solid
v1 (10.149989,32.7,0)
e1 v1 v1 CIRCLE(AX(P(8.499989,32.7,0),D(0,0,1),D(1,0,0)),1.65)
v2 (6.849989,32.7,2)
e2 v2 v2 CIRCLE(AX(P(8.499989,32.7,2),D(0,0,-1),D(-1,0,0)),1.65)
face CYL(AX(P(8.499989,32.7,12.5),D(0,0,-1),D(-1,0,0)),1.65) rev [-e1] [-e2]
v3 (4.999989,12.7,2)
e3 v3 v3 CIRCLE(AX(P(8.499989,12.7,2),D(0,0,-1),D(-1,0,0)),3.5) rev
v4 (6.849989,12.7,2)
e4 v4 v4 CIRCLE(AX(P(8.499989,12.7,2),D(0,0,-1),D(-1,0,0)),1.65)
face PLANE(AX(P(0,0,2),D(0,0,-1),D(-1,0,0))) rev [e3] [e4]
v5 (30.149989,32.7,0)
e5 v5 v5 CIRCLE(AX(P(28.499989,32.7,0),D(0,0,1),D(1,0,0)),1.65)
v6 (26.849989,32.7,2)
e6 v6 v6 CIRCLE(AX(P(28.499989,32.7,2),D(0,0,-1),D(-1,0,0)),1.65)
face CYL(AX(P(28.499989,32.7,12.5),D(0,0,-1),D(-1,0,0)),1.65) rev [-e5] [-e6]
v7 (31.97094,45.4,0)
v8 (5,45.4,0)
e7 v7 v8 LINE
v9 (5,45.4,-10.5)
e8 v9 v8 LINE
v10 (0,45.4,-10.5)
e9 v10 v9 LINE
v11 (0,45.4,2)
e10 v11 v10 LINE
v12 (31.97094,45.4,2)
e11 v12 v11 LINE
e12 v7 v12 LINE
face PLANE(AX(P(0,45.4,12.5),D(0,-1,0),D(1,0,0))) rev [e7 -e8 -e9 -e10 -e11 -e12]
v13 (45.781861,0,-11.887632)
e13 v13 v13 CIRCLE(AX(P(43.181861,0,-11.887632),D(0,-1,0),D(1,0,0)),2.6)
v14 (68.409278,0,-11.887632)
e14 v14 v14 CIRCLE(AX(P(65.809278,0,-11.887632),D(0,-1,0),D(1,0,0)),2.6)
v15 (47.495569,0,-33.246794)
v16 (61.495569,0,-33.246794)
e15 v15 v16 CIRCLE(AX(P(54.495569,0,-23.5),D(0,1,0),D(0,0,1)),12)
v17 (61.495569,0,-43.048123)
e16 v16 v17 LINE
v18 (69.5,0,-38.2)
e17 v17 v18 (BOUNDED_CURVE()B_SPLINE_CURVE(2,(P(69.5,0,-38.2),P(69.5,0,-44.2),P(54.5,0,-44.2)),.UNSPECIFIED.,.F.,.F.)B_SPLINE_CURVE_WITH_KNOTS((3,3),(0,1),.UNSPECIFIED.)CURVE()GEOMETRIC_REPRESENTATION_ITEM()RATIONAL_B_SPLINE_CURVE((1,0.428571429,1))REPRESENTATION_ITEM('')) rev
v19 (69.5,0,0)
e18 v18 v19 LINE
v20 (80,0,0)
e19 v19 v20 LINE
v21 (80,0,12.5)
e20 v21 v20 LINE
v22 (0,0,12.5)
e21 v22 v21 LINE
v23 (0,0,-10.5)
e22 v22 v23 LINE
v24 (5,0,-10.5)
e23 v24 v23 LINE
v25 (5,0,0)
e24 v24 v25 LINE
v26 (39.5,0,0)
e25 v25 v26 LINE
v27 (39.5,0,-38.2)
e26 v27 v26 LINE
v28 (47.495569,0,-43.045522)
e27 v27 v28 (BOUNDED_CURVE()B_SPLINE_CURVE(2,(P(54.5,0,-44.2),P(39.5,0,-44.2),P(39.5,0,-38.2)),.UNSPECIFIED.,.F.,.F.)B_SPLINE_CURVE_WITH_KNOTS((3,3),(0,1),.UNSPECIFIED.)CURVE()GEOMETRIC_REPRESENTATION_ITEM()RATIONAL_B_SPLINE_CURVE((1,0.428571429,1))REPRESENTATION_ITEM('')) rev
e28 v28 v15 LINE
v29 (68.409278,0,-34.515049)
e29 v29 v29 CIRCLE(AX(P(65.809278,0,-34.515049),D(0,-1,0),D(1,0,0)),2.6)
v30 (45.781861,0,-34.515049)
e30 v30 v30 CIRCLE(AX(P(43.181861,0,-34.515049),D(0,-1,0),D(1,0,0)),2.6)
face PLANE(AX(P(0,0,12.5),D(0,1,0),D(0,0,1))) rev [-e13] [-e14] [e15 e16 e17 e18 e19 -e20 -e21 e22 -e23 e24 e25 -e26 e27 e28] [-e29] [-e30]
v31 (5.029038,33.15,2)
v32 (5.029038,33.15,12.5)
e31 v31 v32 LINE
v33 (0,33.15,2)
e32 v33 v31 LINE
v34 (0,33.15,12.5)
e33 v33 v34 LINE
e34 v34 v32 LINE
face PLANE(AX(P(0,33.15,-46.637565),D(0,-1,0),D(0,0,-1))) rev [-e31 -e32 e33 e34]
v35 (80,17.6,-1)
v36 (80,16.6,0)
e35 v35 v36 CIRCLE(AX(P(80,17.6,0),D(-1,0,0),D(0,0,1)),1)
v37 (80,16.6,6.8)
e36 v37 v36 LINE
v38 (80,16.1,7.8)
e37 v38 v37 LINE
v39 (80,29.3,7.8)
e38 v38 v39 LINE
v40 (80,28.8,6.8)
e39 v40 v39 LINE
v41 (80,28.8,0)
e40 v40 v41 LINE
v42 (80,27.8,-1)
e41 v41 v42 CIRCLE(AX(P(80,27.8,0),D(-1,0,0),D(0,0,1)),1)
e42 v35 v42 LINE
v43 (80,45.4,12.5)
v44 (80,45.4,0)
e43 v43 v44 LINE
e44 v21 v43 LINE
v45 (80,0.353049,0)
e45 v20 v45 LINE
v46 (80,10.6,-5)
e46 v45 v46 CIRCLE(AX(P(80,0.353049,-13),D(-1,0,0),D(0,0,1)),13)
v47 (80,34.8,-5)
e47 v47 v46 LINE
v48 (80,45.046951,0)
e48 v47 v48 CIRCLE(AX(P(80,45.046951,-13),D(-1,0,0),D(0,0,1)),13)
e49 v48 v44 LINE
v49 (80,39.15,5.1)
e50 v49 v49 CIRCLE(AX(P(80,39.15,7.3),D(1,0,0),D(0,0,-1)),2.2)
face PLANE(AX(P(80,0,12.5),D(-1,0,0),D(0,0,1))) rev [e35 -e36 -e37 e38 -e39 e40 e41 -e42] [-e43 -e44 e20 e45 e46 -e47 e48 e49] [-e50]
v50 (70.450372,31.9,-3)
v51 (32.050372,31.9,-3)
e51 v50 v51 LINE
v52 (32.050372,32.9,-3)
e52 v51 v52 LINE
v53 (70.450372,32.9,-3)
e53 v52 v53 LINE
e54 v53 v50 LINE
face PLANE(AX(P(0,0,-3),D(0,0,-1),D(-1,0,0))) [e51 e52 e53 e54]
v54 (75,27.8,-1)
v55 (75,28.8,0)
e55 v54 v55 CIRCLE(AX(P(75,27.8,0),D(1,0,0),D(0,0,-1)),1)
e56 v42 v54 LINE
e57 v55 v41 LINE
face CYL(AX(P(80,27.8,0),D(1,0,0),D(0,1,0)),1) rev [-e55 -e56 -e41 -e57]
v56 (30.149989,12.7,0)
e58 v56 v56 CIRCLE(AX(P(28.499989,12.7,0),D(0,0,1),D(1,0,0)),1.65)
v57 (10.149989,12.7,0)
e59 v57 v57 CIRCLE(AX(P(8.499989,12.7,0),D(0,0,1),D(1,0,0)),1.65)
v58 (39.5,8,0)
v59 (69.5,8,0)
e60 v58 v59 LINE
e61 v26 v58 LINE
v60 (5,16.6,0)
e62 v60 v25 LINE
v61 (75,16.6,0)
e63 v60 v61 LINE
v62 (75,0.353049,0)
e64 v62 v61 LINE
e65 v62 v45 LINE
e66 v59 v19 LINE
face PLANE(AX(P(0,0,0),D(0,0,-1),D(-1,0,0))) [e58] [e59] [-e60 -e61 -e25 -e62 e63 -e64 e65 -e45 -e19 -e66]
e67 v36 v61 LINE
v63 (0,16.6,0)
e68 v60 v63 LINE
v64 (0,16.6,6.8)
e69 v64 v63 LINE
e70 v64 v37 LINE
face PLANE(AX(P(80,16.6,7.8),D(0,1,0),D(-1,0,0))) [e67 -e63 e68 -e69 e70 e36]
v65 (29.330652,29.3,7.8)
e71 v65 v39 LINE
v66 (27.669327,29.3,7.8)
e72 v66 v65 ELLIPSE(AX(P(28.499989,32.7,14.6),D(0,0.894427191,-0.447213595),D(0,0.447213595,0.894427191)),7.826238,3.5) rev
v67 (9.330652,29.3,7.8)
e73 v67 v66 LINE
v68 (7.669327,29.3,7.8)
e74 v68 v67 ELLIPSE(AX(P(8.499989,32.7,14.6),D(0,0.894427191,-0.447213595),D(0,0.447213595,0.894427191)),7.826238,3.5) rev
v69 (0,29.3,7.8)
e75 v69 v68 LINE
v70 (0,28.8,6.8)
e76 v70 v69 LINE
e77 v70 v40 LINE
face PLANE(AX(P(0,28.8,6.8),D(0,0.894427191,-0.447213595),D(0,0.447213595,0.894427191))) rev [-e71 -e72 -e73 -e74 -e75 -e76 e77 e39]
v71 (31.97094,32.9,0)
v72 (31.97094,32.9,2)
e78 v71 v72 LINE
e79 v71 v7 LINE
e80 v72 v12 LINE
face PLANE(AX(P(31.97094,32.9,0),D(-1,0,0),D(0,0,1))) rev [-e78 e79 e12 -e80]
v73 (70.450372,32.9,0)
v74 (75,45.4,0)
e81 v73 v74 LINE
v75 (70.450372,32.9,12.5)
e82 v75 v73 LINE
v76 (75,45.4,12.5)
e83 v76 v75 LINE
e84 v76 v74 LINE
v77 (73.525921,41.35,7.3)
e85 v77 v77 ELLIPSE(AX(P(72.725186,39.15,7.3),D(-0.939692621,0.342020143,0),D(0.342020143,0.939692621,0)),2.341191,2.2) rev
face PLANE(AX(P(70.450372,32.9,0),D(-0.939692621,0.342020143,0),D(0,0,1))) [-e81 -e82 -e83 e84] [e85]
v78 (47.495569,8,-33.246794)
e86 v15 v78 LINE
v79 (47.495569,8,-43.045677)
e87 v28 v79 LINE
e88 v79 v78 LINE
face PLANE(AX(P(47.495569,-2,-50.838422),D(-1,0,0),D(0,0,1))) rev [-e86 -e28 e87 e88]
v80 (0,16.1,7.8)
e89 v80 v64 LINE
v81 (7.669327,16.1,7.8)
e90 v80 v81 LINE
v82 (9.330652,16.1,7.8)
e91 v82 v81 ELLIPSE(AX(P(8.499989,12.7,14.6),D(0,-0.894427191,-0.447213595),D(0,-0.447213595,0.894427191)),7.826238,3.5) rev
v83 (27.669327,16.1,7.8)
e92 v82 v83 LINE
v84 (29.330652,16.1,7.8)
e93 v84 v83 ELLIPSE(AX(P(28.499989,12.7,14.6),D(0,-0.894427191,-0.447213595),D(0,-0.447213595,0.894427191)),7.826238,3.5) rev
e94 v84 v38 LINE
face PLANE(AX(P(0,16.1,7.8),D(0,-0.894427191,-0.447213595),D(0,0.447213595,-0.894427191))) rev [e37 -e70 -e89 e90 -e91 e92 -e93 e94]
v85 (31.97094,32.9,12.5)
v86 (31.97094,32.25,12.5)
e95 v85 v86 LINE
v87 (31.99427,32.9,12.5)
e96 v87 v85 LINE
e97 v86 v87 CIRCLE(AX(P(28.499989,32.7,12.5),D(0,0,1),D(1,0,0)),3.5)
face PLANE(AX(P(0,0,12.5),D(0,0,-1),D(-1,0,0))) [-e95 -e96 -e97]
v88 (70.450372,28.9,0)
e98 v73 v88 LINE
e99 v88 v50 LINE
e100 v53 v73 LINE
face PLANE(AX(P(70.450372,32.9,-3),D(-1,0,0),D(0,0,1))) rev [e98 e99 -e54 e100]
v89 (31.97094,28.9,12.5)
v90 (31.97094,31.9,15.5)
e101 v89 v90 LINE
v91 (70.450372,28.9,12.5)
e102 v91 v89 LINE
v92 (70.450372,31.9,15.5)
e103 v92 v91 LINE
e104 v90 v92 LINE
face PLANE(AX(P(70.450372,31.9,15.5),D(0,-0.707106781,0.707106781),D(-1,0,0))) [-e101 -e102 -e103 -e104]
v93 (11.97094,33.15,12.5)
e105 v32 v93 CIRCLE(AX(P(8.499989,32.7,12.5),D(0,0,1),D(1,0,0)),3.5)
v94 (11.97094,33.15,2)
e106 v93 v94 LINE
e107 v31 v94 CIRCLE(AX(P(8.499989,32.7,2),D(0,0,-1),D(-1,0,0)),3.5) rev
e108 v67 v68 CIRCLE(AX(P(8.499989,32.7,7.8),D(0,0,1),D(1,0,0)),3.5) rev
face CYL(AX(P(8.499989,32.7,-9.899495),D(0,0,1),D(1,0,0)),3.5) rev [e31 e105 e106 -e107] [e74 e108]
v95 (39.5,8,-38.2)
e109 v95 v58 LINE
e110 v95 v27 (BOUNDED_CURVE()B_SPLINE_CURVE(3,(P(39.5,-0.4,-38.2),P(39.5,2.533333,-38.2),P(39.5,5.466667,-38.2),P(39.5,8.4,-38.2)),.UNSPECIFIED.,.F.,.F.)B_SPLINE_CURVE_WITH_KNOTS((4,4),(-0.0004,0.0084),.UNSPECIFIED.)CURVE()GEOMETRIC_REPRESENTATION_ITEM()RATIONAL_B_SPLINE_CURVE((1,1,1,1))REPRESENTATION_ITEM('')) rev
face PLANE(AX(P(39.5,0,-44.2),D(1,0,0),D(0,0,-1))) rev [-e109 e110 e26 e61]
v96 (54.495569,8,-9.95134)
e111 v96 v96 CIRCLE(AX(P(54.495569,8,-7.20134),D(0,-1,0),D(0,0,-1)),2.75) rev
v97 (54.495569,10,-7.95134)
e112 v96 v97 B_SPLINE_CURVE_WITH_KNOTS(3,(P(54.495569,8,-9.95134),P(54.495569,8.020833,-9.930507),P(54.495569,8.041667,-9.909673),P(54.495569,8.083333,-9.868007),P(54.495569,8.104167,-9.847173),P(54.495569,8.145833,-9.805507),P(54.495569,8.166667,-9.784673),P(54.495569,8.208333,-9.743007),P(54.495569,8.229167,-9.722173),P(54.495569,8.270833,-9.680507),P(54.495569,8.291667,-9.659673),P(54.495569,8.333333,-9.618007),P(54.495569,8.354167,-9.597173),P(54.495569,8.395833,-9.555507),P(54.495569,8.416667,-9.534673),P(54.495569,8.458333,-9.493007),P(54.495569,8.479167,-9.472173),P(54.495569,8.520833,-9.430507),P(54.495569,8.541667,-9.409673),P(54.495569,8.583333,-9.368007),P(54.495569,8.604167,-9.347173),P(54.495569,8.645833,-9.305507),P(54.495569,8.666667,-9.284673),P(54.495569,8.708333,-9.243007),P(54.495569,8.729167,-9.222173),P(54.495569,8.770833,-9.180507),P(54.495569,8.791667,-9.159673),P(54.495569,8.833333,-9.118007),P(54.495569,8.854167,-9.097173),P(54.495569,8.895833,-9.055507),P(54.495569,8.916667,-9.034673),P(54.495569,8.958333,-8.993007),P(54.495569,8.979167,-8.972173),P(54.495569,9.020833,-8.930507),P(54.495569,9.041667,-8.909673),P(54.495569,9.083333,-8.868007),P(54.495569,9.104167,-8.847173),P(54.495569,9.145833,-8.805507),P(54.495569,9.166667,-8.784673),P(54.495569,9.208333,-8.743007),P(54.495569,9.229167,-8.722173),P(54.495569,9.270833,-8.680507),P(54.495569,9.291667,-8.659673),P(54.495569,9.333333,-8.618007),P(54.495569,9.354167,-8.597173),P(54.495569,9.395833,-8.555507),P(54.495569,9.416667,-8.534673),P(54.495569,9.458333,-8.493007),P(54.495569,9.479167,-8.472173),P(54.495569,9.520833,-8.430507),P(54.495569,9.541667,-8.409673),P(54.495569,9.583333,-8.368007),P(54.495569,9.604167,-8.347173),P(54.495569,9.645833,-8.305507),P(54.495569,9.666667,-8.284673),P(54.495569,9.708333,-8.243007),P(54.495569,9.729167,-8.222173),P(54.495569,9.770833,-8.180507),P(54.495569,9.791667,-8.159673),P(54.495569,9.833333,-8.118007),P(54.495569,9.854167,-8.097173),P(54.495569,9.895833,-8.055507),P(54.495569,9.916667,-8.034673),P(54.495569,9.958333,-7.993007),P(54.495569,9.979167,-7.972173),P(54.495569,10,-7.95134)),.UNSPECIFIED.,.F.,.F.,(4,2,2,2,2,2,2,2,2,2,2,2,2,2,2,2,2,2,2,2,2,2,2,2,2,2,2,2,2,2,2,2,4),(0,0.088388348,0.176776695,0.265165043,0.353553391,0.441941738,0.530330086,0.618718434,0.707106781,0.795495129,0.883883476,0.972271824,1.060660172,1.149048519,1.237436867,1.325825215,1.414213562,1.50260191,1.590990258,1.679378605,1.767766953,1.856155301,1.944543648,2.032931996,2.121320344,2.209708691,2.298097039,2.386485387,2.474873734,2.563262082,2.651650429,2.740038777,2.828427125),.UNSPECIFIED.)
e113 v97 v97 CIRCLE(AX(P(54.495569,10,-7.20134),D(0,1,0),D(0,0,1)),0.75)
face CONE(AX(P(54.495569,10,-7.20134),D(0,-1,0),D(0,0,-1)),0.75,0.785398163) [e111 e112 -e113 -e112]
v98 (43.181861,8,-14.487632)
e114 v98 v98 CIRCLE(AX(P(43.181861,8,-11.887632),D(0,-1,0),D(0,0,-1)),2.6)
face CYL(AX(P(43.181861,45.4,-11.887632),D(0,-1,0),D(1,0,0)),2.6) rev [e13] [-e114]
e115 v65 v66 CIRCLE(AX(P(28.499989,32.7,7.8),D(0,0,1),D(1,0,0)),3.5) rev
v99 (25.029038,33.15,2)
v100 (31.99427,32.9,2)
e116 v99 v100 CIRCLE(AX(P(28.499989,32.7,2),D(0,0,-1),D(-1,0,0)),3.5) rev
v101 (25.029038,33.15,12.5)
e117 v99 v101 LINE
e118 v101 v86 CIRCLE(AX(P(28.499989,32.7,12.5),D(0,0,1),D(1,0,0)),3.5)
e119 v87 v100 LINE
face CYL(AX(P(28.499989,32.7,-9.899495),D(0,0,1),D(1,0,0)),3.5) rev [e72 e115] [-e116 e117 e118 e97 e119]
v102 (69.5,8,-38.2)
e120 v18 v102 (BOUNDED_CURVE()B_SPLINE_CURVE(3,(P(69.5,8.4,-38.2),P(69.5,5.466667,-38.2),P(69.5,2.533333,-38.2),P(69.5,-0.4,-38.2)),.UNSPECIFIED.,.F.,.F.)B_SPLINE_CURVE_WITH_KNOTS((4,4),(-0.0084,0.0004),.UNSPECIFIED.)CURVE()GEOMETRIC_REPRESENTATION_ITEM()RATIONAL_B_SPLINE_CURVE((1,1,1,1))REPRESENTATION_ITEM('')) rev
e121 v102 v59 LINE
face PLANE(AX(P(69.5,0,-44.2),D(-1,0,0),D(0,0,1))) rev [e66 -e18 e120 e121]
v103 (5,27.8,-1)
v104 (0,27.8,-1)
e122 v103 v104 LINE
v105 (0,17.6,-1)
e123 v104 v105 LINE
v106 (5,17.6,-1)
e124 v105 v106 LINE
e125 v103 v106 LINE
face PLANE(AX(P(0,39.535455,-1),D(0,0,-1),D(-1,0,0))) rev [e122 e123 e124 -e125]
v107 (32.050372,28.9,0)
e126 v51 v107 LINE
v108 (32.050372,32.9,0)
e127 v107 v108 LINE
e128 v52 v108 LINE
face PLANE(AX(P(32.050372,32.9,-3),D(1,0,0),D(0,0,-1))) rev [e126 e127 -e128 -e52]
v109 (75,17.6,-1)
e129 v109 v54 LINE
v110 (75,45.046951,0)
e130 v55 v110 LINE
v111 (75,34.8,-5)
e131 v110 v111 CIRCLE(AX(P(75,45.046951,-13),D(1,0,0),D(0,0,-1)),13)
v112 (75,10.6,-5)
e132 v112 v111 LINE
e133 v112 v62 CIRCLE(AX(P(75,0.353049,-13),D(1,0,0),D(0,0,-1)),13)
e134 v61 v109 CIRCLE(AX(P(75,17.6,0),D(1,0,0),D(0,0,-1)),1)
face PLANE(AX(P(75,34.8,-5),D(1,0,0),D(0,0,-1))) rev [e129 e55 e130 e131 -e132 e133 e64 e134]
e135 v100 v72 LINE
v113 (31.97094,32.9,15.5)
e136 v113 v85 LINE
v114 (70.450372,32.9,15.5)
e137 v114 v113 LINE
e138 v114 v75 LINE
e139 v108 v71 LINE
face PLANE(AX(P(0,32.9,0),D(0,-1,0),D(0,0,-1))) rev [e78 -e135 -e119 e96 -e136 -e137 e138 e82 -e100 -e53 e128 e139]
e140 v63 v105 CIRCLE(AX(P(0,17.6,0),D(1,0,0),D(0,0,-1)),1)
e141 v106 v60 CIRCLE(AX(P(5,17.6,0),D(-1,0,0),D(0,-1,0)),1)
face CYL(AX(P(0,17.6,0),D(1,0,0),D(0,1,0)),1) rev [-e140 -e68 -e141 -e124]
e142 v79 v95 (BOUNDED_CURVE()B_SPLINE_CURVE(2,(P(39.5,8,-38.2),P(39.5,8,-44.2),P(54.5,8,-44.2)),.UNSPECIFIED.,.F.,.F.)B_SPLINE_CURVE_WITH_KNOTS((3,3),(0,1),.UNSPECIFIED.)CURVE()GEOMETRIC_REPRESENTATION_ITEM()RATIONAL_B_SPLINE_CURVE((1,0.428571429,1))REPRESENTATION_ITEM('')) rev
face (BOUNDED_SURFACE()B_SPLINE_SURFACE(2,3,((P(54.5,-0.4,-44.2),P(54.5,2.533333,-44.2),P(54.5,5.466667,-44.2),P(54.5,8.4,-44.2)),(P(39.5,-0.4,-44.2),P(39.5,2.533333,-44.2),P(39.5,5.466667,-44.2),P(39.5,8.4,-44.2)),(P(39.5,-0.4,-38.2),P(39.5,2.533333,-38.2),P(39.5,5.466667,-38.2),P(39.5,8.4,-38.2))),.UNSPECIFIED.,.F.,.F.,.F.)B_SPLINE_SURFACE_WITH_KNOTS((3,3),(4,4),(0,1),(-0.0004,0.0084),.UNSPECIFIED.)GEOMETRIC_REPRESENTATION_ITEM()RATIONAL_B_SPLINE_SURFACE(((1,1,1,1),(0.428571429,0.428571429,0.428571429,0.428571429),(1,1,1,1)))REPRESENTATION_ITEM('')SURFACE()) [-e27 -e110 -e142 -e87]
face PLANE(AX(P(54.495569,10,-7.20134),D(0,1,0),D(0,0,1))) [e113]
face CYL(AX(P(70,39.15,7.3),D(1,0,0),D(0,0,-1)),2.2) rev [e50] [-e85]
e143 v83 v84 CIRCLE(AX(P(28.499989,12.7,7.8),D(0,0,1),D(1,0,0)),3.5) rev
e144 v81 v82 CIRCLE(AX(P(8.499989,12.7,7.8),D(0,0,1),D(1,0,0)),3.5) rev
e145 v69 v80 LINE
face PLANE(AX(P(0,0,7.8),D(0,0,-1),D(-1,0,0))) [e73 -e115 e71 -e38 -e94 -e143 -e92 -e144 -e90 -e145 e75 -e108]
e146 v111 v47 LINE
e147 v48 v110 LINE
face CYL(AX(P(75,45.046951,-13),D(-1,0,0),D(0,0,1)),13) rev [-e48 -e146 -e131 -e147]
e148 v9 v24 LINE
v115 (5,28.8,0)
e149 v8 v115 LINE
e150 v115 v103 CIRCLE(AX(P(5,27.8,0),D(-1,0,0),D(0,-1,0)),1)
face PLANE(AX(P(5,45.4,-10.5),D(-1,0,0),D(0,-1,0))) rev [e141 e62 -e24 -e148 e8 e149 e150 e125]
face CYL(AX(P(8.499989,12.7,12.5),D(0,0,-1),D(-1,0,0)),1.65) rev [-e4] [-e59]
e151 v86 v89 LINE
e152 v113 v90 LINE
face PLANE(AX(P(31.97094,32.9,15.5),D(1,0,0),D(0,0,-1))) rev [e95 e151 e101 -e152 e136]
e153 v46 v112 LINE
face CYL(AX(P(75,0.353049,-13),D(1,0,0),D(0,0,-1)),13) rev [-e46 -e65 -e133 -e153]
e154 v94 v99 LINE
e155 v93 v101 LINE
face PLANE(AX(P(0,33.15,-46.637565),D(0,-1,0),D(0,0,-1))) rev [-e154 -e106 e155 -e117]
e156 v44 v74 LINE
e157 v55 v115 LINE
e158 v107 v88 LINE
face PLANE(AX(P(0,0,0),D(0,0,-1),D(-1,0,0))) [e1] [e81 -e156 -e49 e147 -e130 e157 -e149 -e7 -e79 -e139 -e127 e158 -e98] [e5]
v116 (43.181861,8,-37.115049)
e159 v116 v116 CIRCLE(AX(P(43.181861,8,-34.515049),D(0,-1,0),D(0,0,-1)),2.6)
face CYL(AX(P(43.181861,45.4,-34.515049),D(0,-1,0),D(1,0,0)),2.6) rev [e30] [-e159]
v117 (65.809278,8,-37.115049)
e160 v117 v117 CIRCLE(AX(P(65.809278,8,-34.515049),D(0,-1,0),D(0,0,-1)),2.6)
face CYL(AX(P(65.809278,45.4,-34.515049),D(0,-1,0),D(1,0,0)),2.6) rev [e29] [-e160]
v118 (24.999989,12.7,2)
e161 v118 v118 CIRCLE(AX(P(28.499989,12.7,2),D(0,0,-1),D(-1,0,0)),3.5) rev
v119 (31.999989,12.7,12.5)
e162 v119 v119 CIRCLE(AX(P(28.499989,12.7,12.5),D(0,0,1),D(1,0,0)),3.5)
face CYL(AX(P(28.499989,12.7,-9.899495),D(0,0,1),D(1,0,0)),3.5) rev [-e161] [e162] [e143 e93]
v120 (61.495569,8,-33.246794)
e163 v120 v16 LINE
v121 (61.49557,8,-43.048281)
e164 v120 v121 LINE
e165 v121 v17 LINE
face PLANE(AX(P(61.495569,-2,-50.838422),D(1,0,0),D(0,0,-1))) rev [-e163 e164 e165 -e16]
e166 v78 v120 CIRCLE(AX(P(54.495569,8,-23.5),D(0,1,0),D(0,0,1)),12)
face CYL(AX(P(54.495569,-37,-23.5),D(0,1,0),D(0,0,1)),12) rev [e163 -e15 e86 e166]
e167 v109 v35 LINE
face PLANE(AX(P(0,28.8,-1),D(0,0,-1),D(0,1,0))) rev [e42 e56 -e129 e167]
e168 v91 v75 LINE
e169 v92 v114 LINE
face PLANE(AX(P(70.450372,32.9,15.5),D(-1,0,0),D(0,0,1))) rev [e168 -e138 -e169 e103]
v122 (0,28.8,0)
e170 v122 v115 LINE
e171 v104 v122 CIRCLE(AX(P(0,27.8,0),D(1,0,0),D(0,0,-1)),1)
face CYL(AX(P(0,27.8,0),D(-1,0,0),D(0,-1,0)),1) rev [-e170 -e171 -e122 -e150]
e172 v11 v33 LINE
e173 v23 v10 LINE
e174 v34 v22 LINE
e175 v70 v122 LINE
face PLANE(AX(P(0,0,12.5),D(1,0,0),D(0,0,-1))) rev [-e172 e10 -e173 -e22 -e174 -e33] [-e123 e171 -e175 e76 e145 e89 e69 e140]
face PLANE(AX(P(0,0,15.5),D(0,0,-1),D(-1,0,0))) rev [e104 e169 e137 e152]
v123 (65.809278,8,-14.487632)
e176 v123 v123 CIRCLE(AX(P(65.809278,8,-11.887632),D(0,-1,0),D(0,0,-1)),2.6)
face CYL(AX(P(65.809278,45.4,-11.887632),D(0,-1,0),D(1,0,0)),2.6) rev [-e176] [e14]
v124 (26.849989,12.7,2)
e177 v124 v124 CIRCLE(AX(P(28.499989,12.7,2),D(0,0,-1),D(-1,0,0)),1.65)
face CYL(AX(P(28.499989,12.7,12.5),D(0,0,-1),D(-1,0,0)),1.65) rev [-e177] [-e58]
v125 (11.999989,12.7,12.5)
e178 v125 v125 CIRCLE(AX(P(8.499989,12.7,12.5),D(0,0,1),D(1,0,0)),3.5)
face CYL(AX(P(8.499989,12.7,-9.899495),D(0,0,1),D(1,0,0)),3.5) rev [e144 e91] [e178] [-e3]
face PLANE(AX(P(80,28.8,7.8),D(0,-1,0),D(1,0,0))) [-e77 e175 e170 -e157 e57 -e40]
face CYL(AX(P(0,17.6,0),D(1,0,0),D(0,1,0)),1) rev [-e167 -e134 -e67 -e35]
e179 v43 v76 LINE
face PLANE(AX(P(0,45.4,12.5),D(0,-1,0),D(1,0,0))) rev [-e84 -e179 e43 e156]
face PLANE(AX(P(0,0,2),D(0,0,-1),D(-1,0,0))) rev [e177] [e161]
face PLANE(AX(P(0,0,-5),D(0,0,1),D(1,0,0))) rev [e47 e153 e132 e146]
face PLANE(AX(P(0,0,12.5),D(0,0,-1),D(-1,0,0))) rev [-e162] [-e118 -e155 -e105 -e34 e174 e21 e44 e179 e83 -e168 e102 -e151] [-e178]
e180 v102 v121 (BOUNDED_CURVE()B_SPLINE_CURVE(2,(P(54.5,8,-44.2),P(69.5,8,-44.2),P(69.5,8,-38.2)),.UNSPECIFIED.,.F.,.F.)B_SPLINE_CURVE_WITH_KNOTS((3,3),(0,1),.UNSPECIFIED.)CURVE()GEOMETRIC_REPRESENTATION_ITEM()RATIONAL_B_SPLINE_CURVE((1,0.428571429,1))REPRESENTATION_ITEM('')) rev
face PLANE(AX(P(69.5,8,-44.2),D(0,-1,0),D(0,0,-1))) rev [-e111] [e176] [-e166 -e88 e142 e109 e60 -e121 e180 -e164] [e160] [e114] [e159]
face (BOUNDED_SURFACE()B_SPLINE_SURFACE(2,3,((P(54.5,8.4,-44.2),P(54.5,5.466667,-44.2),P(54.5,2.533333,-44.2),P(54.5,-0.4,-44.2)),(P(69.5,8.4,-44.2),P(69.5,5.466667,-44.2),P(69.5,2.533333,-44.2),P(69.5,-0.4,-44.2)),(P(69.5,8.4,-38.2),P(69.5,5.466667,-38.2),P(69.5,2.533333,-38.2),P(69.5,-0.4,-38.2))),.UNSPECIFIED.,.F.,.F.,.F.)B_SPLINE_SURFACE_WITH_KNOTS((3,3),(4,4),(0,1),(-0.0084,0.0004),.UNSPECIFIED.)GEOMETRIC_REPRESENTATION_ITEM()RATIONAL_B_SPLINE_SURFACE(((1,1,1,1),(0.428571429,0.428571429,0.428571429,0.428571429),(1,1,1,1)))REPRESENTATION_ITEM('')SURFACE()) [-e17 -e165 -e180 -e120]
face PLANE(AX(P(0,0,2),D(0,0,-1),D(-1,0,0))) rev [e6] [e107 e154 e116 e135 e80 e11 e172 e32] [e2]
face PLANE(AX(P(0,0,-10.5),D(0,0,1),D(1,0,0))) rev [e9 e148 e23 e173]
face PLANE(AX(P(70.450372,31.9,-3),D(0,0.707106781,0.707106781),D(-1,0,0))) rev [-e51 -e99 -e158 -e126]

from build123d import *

# Parameters (mm, degrees)
SKETCH1_W               = 80
SKETCH1_H               = 45.4
SKETCH1_R               = 1.65
BOSS_EXTRUDE1_DEPTH     = 12.5
SKETCH2_W               = 5
SKETCH2_H               = 45.4
BOSS_EXTRUDE2_DEPTH     = 10.5
CUT_EXTRUDE1_DEPTH      = 7.8
CUT_EXTRUDE1_DEPTH_BACK = 93.830005925
SKETCH3_W               = 80
SKETCH3_H               = 12.2
SKETCH4_W               = 30
SKETCH4_H               = 8
BOSS_EXTRUDE3_DEPTH     = 44.2
SKETCH5_R               = 12
CUT_EXTRUDE2_DEPTH      = 45
CUT_EXTRUDE3_DEPTH      = 96.828388278
CUT_EXTRUDE3_DEPTH_BACK = 96.828388278
SKETCH6_R               = 2.6
FILLET1_SIZE            = 6
FILLET1_SIZE_2          = 15
SKETCH8_R               = 3.5
CUT_EXTRUDE5_DEPTH      = 10.5
SKETCH12_W              = 45
SKETCH12_H              = 12.25
CUT_EXTRUDE8_DEPTH      = 10.5
SKETCH13_W              = 14
SKETCH13_H              = 23.274164218
CUT_EXTRUDE10_DEPTH     = 10
SKETCH15_R              = 2.75
BOSS_EXTRUDE6_DEPTH     = 2
SKETCH16_W              = 43.029059925
SKETCH16_H              = 12.5
CUT_EXTRUDE11_DEPTH     = 12.5
CHAMFER2_SIZE2          = 12.5
CHAMFER2_SIZE           = 4.549627928
SKETCH17_R              = 2.2
CUT_EXTRUDE12_DEPTH     = 10
CUT_EXTRUDE13_DEPTH     = 102.559280367
SKETCH19_W              = 5
SKETCH19_H              = 24.2
BOSS_EXTRUDE7_DEPTH     = 5
SKETCH20_W              = 1
SKETCH20_H              = 12.2
CUT_EXTRUDE14_DEPTH     = 102.559280367
SKETCH21_W              = 5
SKETCH21_H              = 9.5
BOSS_EXTRUDE8_DEPTH     = 12.2
FILLET2_R               = 1
FILLET3_R               = 13
CHAMFER1_SIZE           = 2
SKETCH22_W              = 38.479431997
SKETCH22_H              = 1
BOSS_EXTRUDE9_DEPTH     = 3
SKETCH23_W              = 38.4
SKETCH23_H              = 1
BOSS_EXTRUDE10_DEPTH    = 3
CHAMFER3_SIZE           = 3


# Some blends are built 0.0001 mm under size
with BuildPart() as part:
    # Sketch1 → Boss-Extrude1 (new body)
    with BuildSketch(Plane.XY):
        with Locations((40, 22.7)):
            Rectangle(SKETCH1_W, SKETCH1_H)
        with Locations((8.499989197, 32.7)):
            Circle(SKETCH1_R, mode=Mode.SUBTRACT)
        with Locations((28.499989197, 32.7)):
            Circle(SKETCH1_R, mode=Mode.SUBTRACT)
        with Locations((28.499989197, 12.7)):
            Circle(SKETCH1_R, mode=Mode.SUBTRACT)
        with Locations((8.499989197, 12.7)):
            Circle(SKETCH1_R, mode=Mode.SUBTRACT)
    extrude(amount=BOSS_EXTRUDE1_DEPTH)

    # Sketch2 → Boss-Extrude2 (add)
    with BuildSketch(Plane(origin=(0, 0, 0), x_dir=(-1, 0, 0), z_dir=(0, 0, -1))):
        with Locations((-2.5, 22.7)):
            Rectangle(SKETCH2_W, SKETCH2_H)
    extrude(amount=BOSS_EXTRUDE2_DEPTH)

    # Sketch3 → Cut-Extrude1 (cut, two sides: drawn at the far end of the back side and taken through both)
    with BuildSketch(Plane.XY.offset(-CUT_EXTRUDE1_DEPTH_BACK)):
        with Locations((40, 22.7)):
            Rectangle(SKETCH3_W, SKETCH3_H)
    extrude(amount=CUT_EXTRUDE1_DEPTH + CUT_EXTRUDE1_DEPTH_BACK, mode=Mode.SUBTRACT)

    # Sketch4 → Boss-Extrude3 (add)
    with BuildSketch(Plane(origin=(0, 0, 0), x_dir=(-1, 0, 0), z_dir=(0, 0, -1))):
        with Locations((-54.5, 4)):
            Rectangle(SKETCH4_W, SKETCH4_H)
    extrude(amount=BOSS_EXTRUDE3_DEPTH)

    # Sketch5 → Cut-Extrude2 (cut)
    with BuildSketch(Plane(origin=(0, 8, 0), x_dir=(1, 0, 0), z_dir=(0, 1, 0))):
        with Locations(Location((54.495569327, 23.5, 0), (0, 0, 270))):
            Circle(SKETCH5_R)
    extrude(amount=-CUT_EXTRUDE2_DEPTH, mode=Mode.SUBTRACT)

    # Sketch6 → Cut-Extrude3 (cut, two sides: drawn at the far end of the back side and taken through both)
    with BuildSketch(Plane.XZ.offset(-16.6).offset(-CUT_EXTRUDE3_DEPTH_BACK)):
        with Locations((54.495569327, -39.201340104)):
            Circle(SKETCH6_R)
        with Locations((65.809277826, -34.515048603)):
            Circle(SKETCH6_R)
        with Locations((43.181860828, -34.515048603)):
            Circle(SKETCH6_R)
        with Locations((43.181860828, -11.887631605)):
            Circle(SKETCH6_R)
        with Locations((65.809277826, -11.887631605)):
            Circle(SKETCH6_R)
    extrude(amount=CUT_EXTRUDE3_DEPTH + CUT_EXTRUDE3_DEPTH_BACK, mode=Mode.SUBTRACT)

    # Fillet1
    # a fillet whose section is not a circle: 15, 6 mm, written as the material it takes off along each edge
    with BuildSketch(Plane(origin=(39.5, -37.5, -44.2), x_dir=(0, 0, 1), z_dir=(0, 1, 0)), Plane(origin=(69.5, 45.5, -44.2), x_dir=(0, 0, 1), z_dir=(0, -1, 0))) as fillet1_piece_1:
        with BuildLine():
            Bezier((FILLET1_SIZE, 0), (0, 0), (0, FILLET1_SIZE_2), weights=[1, 0.428571429, 1])
            Line((0, FILLET1_SIZE_2), (0, 0))
            Line((0, 0), (FILLET1_SIZE, 0))
        make_face()
    extrude(amount=83, mode=Mode.SUBTRACT)

    # Sketch8 → Cut-Extrude5 (cut)
    with BuildSketch(Plane.XY.offset(12.5)):
        with Locations((8.499989197, 32.7)):
            Circle(SKETCH8_R)
        with Locations((28.499989197, 32.7)):
            Circle(SKETCH8_R)
        with Locations((8.499989197, 12.7)):
            Circle(SKETCH8_R)
        with Locations((28.499989197, 12.7)):
            Circle(SKETCH8_R)
    extrude(amount=-CUT_EXTRUDE5_DEPTH, mode=Mode.SUBTRACT)

    # Sketch12 → Cut-Extrude8 (cut)
    with BuildSketch(Plane.XY.offset(12.5)):
        with Locations((22.5, 39.275)):
            Rectangle(SKETCH12_W, SKETCH12_H)
    extrude(amount=-CUT_EXTRUDE8_DEPTH, mode=Mode.SUBTRACT)

    # Sketch13 → Cut-Extrude10 (cut)
    with BuildSketch(Plane(origin=(0, 8, 0), x_dir=(1, 0, 0), z_dir=(0, 1, 0))):
        with Locations((54.495569327, 39.201340104)):
            Rectangle(SKETCH13_W, SKETCH13_H)
    extrude(amount=-CUT_EXTRUDE10_DEPTH, mode=Mode.SUBTRACT)

    # Sketch15 → Boss-Extrude6 (add)
    with BuildSketch(Plane(origin=(0, 8, 0), x_dir=(1, 0, 0), z_dir=(0, 1, 0))):
        with Locations(Location((54.495569327, 7.201340104, 0), (0, 0, 90))):
            Circle(SKETCH15_R)
    extrude(amount=BOSS_EXTRUDE6_DEPTH)

    # Sketch16 → Cut-Extrude11 (cut)
    with BuildSketch(Plane(origin=(0, 45.4, 0), x_dir=(1, 0, 0), z_dir=(0, 1, 0))):
        with Locations((53.485470038, -6.25)):
            Rectangle(SKETCH16_W, SKETCH16_H)
    extrude(amount=-CUT_EXTRUDE11_DEPTH, mode=Mode.SUBTRACT)

    # Chamfer2
    chamfer2_edges = [part.edges().sort_by_distance(p)[0] for p in [
        (75, 32.9, 6.25),
    ]]
    chamfer2_side = [part.faces().sort_by_distance(p)[0] for p in [
        (74.909007441, 32.9, 6.25),
    ]]
    chamfer(chamfer2_edges, length=CHAMFER2_SIZE - 0.0001, length2=CHAMFER2_SIZE2 - 0.0001, reference=chamfer2_side[0])  # a hair under: the kernel refuses the full size

    # Sketch17 → Cut-Extrude12 (cut)
    with BuildSketch(Plane(origin=(80, 0, 0), x_dir=(0, 0, -1), z_dir=(1, 0, 0))):
        with Locations((-7.3, 39.15)):
            Circle(SKETCH17_R)
    extrude(amount=-CUT_EXTRUDE12_DEPTH, mode=Mode.SUBTRACT)

    # Sketch18 → Cut-Extrude13 (cut, through all)
    with BuildSketch(Plane(origin=(80, 0, 0), x_dir=(0, 0, -1), z_dir=(1, 0, 0))):
        Polygon((-7.8, 28.8), (-6.8, 28.8), (-7.8, 29.3), align=None)
        Polygon((-7.8, 16.6), (-7.8, 16.1), (-6.8, 16.6), align=None)
    extrude(amount=-CUT_EXTRUDE13_DEPTH, mode=Mode.SUBTRACT)

    # Sketch19 → Boss-Extrude7 (add)
    with BuildSketch(Plane(origin=(0, 0, 0), x_dir=(-1, 0, 0), z_dir=(0, 0, -1))):
        with Locations((-77.5, 22.7)):
            Rectangle(SKETCH19_W, SKETCH19_H)
    extrude(amount=BOSS_EXTRUDE7_DEPTH)

    # Sketch20 → Cut-Extrude14 (cut, through all)
    with BuildSketch(Plane(origin=(80, 0, 0), x_dir=(0, 0, -1), z_dir=(1, 0, 0))):
        with Locations((0.5, 22.7)):
            Rectangle(SKETCH20_W, SKETCH20_H)
    extrude(amount=-CUT_EXTRUDE14_DEPTH, mode=Mode.SUBTRACT)

    # Sketch21 → Boss-Extrude8 (add)
    with BuildSketch(Plane(origin=(0, 16.6, 0), x_dir=(1, 0, 0), z_dir=(0, 1, 0))):
        with Locations((2.5, 5.75)):
            Rectangle(SKETCH21_W, SKETCH21_H)
    extrude(amount=BOSS_EXTRUDE8_DEPTH)

    # Fillet2
    fillet2_edges = [part.edges().sort_by_distance(p)[0] for p in [
        (77.5, 16.6, -1),
        (77.5, 28.8, -1),
        (2.5, 16.6, -1),
        (2.5, 28.8, -1),
    ]]
    fillet(fillet2_edges, radius=FILLET2_R)

    # Fillet3
    # the kernel refuses this fillet: 13 mm, written as the material it adds along each edge
    with BuildSketch(Plane(origin=(80, 10.6, 0), x_dir=(0, -1, 0), z_dir=(-1, 0, 0)), Plane(origin=(75, 34.8, 0), x_dir=(0, 1, 0), z_dir=(1, 0, 0))) as fillet3_piece_1:
        with BuildLine():
            CenterArc((10.246950766, -13), FILLET3_R, 90, 52.020127555)
            Line((0, -5), (0, 0))
            Line((0, 0), (10.246950766, 0))
        make_face()
    extrude(amount=5)

    # Chamfer1
    chamfer1_edges = [part.edges().sort_by_distance(p)[0] for p in [
        (54.495569327, 10, -4.451340104),
    ]]
    chamfer(chamfer1_edges, length=CHAMFER1_SIZE - 0.0001)  # a hair under: the kernel refuses the full size

    # Sketch22 → Boss-Extrude9 (add)
    with BuildSketch(Plane.XY.offset(12.5)):
        with Locations((51.210656074, 32.4)):
            Rectangle(SKETCH22_W, SKETCH22_H)
    extrude(amount=BOSS_EXTRUDE9_DEPTH)

    # Sketch23 → Boss-Extrude10 (add)
    with BuildSketch(Plane(origin=(0, 0, 0), x_dir=(-1, 0, 0), z_dir=(0, 0, -1))):
        with Locations((-51.250372072, 32.4)):
            Rectangle(SKETCH23_W, SKETCH23_H)
    extrude(amount=BOSS_EXTRUDE10_DEPTH)

    # Chamfer3
    chamfer3_edges = [part.edges().sort_by_distance(p)[0] for p in [
        (51.210656074, 31.9, 12.5),
        (51.250372072, 31.9, 0),
    ]]
    chamfer(chamfer3_edges, length=CHAMFER3_SIZE - 0.0001)  # a hair under: the kernel refuses the full size


solid = part.part
